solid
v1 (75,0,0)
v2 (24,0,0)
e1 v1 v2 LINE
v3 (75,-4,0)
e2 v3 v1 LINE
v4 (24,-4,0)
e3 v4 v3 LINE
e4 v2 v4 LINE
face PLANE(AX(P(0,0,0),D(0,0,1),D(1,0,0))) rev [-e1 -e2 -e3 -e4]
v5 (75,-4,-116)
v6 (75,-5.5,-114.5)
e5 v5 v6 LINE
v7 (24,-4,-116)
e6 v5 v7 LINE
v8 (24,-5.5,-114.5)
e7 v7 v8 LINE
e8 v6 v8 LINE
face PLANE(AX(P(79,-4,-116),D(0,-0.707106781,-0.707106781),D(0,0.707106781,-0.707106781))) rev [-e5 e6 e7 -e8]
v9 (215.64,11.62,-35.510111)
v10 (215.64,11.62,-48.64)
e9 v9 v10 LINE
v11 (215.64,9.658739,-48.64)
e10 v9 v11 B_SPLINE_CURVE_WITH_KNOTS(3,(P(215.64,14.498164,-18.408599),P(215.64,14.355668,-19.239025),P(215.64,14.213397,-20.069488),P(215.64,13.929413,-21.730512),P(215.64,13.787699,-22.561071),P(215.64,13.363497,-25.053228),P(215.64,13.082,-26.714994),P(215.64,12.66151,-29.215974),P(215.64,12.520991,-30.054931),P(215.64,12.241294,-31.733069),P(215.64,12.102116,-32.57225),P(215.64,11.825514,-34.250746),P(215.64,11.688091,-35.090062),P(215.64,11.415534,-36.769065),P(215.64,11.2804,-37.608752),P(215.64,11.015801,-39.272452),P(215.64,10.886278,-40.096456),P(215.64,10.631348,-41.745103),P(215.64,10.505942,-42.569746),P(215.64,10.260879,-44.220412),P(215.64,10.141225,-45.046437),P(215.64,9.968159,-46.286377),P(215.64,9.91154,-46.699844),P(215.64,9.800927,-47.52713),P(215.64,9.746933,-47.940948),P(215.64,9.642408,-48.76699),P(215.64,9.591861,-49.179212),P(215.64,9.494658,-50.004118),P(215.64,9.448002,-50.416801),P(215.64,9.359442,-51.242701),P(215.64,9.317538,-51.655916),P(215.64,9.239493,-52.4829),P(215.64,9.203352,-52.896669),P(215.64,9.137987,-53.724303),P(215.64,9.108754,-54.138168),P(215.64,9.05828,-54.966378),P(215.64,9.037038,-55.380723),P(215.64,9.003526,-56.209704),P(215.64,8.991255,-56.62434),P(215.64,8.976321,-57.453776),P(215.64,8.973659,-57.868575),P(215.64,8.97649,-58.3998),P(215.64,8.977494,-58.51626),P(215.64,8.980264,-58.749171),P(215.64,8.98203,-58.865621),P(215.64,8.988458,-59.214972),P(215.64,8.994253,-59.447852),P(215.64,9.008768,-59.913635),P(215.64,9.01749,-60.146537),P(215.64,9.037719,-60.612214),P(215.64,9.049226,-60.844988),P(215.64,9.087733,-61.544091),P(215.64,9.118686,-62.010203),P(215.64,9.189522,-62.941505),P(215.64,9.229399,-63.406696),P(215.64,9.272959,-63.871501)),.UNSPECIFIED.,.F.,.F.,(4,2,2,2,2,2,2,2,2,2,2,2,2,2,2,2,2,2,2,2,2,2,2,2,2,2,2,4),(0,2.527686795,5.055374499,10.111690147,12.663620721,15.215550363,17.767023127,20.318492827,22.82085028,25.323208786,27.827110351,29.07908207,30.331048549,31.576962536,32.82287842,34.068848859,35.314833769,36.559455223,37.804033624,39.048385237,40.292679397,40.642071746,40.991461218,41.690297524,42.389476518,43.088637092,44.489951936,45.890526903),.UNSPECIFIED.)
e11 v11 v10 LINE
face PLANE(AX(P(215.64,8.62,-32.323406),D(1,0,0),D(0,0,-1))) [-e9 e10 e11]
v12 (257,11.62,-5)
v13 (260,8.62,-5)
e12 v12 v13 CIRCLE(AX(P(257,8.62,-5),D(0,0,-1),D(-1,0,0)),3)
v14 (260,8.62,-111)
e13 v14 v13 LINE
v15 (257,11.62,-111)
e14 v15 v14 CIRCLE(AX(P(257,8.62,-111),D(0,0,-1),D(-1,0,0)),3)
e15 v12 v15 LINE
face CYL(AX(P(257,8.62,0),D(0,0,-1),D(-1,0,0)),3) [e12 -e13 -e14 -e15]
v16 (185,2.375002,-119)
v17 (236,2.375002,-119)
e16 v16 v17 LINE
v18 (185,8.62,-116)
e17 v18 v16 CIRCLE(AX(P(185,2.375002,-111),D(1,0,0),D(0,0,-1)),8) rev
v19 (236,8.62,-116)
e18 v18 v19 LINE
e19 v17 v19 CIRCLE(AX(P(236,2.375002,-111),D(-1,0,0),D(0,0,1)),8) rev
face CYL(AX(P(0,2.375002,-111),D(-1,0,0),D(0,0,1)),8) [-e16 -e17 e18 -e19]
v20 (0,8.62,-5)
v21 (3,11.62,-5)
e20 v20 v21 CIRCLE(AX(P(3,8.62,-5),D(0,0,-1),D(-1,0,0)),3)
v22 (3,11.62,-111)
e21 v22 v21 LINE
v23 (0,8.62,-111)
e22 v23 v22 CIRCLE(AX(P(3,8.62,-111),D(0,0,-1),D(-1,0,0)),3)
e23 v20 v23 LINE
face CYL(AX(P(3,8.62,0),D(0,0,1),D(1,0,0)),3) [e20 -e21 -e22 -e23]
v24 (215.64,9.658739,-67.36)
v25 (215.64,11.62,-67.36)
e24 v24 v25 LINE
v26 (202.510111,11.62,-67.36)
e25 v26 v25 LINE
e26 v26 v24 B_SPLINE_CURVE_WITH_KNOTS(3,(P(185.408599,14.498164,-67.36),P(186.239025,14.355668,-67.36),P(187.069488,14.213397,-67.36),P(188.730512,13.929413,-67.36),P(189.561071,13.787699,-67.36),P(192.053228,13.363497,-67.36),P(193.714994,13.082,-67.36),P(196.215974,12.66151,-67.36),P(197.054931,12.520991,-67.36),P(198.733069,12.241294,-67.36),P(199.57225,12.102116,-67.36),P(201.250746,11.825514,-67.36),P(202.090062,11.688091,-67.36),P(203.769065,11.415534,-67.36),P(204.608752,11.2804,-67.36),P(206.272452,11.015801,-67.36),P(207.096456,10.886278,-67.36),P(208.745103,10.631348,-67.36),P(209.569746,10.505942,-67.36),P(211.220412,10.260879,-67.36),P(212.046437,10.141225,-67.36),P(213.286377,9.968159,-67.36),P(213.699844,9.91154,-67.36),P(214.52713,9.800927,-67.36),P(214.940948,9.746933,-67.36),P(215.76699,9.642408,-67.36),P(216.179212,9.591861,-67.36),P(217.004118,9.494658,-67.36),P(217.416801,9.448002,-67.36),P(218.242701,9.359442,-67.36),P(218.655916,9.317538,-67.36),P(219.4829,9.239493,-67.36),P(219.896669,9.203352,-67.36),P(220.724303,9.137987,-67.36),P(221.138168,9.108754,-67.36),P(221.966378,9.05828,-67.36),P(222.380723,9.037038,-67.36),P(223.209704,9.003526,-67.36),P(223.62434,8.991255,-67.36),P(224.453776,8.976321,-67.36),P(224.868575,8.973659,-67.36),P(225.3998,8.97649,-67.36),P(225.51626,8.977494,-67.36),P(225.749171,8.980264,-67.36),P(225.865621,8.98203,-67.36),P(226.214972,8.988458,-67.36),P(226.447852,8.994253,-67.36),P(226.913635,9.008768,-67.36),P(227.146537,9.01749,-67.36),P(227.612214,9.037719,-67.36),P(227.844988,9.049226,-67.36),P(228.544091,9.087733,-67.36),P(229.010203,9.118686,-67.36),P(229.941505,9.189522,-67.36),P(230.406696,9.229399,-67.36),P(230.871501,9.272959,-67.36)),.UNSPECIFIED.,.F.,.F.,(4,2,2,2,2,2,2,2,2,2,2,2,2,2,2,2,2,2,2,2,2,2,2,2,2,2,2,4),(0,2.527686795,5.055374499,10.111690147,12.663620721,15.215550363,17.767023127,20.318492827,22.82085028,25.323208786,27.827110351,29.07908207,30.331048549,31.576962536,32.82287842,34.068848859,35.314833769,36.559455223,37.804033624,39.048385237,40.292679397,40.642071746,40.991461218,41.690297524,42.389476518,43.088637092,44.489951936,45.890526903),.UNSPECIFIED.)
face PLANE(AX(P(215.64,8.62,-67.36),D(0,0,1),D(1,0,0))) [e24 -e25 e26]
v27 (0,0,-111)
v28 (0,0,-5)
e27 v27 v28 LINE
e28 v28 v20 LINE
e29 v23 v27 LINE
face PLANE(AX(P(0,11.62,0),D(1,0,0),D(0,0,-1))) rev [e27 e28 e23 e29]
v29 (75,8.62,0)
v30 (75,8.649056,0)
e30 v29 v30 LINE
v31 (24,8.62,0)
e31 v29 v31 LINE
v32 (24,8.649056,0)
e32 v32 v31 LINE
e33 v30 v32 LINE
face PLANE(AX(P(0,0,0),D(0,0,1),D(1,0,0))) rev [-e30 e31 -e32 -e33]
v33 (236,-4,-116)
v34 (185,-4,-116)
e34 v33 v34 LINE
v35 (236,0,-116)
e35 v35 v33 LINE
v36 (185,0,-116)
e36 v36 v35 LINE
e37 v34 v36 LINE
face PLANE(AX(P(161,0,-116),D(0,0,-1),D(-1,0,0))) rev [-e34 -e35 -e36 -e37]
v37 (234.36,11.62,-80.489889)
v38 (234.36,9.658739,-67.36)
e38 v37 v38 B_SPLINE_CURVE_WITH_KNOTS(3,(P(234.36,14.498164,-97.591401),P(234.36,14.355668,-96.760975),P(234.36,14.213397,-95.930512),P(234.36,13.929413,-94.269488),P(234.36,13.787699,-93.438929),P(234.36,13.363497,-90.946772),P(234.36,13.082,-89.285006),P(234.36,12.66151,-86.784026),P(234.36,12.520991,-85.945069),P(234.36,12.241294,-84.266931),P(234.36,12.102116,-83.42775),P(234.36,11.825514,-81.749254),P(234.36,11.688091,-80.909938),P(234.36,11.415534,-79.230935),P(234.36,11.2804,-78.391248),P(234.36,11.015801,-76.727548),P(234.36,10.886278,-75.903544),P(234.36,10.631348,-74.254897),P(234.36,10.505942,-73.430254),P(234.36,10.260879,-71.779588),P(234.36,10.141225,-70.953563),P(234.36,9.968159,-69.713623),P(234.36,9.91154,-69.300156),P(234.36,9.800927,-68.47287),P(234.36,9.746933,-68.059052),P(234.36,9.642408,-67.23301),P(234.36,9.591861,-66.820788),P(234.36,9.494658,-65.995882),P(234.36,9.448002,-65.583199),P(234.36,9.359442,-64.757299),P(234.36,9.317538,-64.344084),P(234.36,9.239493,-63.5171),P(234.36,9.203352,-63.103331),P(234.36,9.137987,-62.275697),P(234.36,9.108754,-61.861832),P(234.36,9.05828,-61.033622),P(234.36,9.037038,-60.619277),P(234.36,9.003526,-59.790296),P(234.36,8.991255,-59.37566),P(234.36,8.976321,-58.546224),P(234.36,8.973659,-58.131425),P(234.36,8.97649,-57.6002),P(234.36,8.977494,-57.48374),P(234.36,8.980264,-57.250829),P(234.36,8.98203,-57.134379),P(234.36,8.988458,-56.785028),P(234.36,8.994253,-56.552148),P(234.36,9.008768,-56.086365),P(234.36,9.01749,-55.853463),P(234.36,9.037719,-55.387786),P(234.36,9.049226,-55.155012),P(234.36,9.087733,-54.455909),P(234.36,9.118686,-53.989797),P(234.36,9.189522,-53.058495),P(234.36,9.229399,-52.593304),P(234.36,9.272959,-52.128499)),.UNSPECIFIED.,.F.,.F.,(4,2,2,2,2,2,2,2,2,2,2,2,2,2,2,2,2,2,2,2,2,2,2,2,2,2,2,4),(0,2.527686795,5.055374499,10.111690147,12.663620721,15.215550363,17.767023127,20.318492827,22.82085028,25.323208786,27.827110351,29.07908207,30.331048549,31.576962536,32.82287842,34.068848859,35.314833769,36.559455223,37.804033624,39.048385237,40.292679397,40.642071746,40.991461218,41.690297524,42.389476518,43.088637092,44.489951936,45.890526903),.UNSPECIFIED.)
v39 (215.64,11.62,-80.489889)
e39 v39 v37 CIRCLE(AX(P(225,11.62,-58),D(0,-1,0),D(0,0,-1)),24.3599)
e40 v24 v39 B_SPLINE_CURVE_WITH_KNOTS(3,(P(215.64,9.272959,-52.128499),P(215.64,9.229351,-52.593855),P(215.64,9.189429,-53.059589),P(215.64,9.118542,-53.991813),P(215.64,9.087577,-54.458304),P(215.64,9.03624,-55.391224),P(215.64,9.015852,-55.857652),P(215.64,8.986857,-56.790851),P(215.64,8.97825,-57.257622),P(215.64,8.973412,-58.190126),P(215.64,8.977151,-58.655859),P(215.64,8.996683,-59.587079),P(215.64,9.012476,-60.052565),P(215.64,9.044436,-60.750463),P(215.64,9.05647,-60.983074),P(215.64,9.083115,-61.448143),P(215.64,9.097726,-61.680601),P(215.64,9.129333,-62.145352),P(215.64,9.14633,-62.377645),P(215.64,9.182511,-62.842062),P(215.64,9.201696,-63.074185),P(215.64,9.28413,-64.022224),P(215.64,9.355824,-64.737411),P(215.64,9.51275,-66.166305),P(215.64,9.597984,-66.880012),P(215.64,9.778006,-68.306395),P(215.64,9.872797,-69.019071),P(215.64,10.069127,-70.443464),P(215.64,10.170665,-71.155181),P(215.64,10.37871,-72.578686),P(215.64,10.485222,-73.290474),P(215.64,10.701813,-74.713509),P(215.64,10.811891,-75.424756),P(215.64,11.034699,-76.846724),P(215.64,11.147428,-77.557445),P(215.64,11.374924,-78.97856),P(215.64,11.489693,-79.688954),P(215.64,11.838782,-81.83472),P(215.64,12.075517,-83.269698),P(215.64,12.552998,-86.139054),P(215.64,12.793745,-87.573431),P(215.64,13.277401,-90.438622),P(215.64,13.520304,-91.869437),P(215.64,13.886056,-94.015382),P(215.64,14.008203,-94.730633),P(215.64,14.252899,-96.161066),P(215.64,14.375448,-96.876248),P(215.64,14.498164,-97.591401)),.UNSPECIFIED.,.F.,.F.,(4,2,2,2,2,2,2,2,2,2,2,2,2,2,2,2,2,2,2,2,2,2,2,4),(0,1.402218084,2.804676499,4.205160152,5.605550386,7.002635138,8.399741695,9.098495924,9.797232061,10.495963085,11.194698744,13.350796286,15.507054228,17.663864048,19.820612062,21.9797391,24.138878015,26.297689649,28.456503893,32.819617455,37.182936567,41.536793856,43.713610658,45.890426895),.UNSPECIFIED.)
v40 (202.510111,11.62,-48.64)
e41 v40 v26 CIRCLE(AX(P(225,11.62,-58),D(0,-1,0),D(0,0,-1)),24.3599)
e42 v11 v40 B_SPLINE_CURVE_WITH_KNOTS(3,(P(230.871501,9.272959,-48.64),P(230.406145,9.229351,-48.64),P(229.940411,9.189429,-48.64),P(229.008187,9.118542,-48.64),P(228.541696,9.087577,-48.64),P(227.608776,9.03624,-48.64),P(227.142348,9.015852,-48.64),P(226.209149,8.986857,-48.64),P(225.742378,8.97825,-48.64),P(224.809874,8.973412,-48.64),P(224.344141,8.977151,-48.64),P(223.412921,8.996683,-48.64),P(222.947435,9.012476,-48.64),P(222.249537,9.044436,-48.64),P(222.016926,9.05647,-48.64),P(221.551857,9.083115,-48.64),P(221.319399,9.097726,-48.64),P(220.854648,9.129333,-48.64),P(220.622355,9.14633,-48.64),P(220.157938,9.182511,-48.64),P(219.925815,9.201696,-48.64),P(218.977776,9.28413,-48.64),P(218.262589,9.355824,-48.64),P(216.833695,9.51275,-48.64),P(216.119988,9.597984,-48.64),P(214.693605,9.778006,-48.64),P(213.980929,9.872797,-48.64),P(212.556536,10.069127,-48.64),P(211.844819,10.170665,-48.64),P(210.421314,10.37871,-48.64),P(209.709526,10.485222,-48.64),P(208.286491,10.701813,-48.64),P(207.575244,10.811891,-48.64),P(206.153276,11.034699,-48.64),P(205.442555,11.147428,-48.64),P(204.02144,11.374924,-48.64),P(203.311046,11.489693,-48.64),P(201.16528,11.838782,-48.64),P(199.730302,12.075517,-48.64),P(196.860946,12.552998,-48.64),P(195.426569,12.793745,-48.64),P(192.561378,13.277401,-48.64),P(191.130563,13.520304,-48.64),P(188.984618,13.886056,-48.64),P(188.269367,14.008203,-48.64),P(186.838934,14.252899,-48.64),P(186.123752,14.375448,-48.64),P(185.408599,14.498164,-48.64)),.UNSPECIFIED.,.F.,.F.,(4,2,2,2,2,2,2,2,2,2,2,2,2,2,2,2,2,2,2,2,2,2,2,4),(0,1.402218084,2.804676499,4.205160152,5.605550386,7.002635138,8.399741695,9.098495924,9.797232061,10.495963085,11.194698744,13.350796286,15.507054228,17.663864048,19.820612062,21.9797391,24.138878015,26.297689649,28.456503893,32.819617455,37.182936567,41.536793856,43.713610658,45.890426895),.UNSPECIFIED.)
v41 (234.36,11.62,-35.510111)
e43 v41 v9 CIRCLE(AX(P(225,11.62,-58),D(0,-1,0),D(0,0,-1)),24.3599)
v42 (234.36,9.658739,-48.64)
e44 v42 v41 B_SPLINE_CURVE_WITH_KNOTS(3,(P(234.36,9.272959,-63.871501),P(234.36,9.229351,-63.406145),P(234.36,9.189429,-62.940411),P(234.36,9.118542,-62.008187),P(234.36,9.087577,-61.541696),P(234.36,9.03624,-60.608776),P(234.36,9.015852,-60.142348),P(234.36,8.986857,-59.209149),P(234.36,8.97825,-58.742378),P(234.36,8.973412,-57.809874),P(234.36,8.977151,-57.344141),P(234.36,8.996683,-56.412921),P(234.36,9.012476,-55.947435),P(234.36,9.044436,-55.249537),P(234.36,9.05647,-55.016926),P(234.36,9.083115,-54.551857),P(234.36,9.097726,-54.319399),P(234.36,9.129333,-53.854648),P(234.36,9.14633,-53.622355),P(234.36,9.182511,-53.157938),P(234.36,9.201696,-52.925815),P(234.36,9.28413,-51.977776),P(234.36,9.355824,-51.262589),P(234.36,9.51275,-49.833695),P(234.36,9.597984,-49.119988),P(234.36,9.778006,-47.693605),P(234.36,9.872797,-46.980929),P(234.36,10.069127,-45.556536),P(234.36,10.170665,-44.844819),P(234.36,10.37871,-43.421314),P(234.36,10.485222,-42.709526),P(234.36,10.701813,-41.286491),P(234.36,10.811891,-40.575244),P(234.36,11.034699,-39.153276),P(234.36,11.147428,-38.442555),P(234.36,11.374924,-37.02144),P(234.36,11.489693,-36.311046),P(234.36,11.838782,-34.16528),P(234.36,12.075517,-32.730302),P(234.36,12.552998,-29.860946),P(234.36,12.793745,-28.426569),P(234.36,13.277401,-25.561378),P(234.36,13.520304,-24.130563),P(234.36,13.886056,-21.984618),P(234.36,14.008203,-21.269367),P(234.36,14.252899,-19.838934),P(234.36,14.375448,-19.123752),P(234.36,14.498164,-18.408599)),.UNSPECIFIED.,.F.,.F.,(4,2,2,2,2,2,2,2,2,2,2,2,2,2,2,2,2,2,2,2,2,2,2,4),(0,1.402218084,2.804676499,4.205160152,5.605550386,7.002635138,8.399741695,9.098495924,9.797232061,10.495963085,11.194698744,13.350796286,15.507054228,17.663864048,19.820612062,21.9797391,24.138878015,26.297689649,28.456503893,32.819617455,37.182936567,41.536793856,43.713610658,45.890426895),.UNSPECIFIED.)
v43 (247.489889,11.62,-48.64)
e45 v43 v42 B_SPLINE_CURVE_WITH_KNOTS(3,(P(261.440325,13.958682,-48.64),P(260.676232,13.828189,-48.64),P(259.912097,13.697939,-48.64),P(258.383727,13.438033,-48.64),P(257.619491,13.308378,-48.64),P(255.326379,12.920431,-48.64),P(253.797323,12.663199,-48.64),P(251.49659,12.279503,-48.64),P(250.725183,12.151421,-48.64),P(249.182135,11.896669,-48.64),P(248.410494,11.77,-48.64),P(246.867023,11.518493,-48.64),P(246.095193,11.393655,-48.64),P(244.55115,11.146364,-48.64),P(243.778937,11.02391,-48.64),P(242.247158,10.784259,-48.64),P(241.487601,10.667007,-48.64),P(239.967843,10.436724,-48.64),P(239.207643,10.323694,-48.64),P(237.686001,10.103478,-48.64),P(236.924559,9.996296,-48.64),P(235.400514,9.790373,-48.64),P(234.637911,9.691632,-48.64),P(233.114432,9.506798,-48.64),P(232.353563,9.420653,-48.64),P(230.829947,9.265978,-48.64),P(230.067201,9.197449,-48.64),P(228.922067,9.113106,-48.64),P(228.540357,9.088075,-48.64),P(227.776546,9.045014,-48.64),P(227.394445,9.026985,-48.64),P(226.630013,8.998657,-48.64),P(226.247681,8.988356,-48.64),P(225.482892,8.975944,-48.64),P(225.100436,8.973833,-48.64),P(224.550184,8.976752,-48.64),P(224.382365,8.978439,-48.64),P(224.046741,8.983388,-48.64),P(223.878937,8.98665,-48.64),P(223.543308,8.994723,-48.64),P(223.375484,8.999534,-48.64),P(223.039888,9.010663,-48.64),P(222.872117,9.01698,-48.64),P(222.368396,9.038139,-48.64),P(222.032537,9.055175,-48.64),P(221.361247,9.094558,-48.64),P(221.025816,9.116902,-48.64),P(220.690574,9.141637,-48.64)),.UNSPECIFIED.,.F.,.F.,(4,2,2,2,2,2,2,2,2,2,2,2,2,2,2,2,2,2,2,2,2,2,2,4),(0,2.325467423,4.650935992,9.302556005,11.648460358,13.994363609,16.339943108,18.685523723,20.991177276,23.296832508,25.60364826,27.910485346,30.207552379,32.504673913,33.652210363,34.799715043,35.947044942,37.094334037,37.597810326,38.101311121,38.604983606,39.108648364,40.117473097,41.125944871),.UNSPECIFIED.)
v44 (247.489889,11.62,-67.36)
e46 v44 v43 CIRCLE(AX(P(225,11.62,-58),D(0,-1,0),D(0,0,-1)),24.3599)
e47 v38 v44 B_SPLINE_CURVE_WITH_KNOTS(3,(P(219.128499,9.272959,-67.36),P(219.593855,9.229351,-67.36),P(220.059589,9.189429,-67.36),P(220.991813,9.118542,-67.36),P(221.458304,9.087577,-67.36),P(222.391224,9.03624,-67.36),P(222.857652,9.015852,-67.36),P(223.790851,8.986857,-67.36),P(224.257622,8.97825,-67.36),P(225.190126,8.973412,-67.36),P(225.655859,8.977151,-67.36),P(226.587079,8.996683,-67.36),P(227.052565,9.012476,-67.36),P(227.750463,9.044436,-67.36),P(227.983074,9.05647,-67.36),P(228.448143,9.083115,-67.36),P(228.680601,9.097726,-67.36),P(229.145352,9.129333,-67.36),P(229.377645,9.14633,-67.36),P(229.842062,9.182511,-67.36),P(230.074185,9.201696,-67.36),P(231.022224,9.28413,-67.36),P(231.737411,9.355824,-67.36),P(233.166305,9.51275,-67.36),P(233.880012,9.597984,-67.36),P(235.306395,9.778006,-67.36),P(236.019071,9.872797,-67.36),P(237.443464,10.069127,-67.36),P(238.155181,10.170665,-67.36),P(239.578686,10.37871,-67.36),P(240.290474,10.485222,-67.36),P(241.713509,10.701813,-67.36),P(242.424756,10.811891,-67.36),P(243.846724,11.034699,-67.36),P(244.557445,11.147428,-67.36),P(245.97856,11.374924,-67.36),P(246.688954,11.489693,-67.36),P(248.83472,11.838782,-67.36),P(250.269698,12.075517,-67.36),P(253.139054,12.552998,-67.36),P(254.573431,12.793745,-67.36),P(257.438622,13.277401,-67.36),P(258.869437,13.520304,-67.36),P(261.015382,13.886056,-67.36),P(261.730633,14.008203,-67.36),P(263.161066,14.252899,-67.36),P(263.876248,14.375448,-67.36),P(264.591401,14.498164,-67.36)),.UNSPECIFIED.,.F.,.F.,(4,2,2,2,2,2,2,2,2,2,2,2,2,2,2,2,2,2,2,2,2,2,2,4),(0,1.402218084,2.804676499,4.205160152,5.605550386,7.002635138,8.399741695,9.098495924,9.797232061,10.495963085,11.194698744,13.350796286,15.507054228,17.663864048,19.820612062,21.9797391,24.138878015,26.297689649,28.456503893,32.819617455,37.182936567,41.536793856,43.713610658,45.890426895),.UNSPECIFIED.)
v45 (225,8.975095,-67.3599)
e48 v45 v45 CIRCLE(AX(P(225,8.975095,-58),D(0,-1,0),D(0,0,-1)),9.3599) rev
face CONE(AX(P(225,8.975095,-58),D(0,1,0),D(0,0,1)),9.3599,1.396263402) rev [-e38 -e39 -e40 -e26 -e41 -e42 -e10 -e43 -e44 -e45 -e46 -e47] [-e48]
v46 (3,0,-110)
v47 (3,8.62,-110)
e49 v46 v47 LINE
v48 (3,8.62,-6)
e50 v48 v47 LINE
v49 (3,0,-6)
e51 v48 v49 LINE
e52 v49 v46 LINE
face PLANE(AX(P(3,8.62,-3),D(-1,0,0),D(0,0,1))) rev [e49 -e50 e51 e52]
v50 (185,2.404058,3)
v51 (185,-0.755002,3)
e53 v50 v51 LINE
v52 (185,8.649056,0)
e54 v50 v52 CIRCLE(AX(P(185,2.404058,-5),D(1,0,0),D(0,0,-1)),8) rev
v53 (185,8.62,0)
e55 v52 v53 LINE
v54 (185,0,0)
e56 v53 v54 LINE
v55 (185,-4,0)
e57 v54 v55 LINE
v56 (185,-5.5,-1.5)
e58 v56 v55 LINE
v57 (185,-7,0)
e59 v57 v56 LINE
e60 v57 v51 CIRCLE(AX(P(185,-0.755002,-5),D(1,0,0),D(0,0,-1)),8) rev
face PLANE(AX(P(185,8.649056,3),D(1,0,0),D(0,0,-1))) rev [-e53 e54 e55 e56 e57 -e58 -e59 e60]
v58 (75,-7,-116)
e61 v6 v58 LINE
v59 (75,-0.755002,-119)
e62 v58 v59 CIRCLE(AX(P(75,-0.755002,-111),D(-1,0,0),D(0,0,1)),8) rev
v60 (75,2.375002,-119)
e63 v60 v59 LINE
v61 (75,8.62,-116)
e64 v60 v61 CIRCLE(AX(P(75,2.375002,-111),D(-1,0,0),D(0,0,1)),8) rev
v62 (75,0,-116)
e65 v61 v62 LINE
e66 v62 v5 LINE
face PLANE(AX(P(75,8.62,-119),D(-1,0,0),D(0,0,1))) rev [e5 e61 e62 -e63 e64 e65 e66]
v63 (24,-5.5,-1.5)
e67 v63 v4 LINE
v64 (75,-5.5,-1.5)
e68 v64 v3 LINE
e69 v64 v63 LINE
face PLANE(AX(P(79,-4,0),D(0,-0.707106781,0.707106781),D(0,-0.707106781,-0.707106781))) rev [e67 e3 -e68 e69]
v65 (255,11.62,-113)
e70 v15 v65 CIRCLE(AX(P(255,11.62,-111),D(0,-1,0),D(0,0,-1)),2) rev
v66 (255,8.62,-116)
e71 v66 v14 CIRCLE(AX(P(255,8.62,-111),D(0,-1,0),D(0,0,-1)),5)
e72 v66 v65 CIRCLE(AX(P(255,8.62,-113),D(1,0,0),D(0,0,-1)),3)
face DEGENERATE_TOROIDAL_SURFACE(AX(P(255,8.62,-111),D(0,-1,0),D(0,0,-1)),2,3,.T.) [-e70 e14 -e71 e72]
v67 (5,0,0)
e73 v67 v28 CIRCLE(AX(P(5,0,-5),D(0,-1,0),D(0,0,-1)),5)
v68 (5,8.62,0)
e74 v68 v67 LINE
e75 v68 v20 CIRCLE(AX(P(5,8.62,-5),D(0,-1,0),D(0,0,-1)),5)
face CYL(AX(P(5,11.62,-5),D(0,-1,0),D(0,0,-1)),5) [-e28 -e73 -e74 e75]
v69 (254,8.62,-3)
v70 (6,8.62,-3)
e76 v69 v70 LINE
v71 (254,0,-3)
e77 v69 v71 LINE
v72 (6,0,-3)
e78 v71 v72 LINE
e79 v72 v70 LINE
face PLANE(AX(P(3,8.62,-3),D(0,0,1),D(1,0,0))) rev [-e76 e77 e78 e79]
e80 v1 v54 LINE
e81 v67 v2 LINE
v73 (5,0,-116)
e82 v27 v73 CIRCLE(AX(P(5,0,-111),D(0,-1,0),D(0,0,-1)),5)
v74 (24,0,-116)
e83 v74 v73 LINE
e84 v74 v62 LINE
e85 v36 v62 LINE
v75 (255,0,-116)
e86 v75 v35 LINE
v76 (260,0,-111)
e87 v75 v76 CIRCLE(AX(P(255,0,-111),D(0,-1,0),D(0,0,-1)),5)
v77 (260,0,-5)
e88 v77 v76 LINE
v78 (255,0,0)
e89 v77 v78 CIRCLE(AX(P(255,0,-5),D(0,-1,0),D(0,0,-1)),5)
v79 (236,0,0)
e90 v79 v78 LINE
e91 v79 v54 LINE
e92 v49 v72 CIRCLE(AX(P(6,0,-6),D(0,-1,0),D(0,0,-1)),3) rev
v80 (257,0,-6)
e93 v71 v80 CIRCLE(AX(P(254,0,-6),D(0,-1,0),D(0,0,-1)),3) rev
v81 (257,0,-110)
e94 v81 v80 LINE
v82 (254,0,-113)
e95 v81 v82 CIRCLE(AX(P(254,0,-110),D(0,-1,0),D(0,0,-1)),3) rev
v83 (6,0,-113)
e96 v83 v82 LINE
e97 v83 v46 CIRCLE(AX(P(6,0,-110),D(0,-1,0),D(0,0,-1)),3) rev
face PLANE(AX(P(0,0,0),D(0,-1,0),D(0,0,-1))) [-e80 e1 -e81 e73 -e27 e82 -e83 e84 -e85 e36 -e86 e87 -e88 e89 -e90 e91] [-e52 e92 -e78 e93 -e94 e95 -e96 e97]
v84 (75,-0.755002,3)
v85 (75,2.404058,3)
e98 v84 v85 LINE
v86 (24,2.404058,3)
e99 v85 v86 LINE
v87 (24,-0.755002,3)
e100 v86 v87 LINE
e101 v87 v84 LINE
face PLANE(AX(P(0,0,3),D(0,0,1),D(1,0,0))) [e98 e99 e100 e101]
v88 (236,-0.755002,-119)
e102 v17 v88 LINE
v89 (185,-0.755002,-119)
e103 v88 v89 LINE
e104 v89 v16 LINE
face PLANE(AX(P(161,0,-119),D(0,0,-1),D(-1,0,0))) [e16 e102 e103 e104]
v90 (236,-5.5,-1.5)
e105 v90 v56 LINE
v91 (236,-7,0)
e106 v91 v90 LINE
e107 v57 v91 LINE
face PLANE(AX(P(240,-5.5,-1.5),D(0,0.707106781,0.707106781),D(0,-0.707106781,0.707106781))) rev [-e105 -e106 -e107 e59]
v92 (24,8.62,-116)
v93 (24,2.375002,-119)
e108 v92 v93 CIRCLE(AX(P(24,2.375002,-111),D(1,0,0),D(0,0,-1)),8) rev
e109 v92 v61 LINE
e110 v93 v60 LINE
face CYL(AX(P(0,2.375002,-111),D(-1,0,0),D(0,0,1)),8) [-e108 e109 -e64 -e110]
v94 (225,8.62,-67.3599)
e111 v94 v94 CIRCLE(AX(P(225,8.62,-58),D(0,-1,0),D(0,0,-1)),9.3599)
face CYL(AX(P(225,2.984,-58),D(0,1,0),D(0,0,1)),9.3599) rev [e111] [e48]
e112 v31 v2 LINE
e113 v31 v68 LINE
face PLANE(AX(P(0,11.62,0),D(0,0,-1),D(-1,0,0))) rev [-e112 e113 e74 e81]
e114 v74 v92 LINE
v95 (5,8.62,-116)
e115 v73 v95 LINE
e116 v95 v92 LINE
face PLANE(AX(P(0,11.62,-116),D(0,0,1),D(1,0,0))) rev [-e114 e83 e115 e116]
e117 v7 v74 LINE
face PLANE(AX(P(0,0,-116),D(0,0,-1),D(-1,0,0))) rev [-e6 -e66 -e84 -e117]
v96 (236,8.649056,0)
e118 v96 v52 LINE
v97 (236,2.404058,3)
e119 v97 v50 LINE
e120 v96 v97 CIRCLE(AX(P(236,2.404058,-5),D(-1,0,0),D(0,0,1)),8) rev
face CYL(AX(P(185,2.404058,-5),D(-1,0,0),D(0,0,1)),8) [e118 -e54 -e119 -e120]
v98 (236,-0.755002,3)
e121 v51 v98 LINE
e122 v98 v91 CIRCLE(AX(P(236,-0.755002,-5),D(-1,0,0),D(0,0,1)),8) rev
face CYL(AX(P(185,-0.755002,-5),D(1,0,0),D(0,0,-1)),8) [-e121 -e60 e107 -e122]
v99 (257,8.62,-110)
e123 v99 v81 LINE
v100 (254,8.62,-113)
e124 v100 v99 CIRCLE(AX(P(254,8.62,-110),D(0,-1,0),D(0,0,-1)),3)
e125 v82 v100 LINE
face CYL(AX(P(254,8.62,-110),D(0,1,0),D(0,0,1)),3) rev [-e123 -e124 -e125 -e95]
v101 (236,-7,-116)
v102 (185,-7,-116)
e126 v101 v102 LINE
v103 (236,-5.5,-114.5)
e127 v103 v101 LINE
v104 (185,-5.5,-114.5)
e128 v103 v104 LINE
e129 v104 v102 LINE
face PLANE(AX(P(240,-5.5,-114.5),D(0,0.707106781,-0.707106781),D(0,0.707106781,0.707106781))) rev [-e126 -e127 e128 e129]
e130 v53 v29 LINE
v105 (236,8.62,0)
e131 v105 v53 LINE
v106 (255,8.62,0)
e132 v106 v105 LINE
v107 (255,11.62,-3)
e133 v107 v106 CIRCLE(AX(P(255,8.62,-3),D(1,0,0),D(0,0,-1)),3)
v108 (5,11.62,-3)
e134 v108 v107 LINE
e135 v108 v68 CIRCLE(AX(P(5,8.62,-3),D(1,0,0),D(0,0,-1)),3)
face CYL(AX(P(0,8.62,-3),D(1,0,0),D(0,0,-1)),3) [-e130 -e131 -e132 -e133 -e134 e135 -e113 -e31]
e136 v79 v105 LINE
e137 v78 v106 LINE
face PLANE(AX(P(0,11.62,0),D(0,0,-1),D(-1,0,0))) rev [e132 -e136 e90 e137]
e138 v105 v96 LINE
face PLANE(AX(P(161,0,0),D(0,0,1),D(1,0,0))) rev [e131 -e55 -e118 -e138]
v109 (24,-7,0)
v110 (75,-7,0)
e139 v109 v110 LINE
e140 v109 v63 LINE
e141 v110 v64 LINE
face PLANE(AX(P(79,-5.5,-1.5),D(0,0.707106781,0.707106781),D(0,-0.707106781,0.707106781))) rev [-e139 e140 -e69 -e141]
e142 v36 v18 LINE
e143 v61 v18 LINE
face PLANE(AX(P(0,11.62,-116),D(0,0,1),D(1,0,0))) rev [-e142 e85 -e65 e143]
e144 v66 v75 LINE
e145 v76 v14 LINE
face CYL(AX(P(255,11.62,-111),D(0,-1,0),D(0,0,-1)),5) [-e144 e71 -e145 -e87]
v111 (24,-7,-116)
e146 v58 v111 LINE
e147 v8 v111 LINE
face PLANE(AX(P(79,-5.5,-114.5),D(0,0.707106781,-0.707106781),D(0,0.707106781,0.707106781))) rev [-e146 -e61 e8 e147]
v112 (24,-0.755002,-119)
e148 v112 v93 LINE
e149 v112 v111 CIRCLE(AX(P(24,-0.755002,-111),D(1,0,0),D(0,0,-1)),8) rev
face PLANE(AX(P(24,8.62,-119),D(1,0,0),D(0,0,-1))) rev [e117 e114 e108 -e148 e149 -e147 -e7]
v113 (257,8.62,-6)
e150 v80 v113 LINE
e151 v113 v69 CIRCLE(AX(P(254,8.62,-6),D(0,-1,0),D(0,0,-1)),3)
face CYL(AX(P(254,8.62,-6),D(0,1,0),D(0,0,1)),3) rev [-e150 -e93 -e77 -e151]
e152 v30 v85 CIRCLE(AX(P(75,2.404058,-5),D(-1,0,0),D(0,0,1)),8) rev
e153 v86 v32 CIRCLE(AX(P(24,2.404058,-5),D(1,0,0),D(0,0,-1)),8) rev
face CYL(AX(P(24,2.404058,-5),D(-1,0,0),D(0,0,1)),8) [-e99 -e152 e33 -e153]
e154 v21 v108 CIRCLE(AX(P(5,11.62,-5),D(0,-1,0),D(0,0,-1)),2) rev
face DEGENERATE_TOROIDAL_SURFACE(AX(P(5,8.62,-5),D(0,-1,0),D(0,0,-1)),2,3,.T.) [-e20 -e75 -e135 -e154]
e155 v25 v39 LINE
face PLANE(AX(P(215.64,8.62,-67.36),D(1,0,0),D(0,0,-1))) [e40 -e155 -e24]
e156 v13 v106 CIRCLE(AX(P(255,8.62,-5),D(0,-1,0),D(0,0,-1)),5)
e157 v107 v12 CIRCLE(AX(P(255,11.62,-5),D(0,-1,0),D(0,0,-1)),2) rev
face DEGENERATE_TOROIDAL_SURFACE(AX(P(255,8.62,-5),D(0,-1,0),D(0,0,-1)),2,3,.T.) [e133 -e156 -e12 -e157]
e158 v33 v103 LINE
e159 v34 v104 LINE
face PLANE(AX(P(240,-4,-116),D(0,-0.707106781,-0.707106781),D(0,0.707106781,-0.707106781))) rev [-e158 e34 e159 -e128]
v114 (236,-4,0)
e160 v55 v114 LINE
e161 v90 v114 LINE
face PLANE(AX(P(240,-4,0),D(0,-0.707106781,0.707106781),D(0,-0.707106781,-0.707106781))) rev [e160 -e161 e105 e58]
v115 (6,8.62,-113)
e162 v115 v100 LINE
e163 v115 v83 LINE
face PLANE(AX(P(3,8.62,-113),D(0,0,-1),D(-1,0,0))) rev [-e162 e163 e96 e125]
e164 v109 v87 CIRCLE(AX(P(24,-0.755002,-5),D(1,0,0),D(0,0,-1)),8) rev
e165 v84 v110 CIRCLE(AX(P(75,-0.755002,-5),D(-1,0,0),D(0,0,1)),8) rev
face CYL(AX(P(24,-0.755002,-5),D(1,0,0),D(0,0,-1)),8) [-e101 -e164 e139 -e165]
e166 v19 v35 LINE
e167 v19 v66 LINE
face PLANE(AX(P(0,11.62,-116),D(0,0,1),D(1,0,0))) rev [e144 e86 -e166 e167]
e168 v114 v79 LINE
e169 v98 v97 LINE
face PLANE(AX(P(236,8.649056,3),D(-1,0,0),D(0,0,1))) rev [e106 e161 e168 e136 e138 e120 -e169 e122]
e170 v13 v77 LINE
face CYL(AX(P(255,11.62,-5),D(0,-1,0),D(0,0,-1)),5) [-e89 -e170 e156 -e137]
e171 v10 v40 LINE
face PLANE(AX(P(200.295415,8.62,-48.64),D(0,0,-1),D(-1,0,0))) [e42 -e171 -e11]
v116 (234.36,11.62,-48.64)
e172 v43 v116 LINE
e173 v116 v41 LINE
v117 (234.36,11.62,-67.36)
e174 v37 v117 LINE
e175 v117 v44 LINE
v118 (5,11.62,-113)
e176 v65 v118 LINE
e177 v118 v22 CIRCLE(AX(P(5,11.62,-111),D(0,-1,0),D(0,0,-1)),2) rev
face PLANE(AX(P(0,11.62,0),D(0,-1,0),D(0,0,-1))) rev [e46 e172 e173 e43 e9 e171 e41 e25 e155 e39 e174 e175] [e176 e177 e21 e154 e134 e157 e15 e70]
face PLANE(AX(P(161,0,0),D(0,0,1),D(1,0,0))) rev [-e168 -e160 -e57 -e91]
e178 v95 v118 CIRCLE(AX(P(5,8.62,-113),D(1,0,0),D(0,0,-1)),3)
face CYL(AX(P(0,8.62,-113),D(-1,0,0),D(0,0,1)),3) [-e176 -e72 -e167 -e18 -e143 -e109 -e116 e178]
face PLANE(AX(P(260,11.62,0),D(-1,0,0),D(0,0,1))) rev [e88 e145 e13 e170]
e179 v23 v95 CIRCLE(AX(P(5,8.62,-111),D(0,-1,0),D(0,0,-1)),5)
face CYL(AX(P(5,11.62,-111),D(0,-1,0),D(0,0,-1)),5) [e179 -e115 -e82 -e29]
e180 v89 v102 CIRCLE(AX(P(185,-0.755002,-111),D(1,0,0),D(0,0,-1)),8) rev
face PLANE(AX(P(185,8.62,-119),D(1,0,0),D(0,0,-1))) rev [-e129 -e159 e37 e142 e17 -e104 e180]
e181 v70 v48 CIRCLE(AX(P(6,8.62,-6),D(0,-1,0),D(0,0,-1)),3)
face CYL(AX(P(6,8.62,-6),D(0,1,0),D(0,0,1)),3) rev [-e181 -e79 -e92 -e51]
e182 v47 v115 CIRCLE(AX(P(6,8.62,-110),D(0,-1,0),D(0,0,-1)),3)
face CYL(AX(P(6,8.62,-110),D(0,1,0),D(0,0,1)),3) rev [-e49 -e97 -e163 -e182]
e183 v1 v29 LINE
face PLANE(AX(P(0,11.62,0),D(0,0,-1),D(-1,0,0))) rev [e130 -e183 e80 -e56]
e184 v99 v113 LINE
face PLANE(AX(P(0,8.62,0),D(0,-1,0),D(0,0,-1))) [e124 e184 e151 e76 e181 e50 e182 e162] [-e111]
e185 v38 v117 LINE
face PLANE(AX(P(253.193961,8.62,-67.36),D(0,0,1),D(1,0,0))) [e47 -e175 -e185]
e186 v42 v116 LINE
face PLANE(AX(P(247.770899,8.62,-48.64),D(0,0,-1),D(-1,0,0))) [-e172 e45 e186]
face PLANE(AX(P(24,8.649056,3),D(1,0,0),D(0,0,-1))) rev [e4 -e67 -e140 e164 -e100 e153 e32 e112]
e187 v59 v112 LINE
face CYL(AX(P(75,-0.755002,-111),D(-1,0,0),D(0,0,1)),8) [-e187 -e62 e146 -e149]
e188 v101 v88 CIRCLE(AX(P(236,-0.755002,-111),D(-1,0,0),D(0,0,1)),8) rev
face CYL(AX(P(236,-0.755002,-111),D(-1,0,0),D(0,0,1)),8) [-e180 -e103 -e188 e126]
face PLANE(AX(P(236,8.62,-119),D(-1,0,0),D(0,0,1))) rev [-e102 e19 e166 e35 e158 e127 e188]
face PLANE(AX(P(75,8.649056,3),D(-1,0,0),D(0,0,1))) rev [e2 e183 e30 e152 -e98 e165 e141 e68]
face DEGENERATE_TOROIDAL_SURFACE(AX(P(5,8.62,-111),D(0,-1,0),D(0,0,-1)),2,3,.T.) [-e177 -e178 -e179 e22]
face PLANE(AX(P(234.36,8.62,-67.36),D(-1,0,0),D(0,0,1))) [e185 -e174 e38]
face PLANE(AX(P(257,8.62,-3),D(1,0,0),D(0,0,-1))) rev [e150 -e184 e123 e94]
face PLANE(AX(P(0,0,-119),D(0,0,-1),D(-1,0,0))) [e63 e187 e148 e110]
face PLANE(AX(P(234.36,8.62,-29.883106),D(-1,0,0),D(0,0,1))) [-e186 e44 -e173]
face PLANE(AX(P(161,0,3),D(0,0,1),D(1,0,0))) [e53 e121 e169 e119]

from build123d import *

# Parameters (mm, degrees)
SKETCH1_W              = 260
SKETCH1_H              = 116
BOSS_EXTRUDE1_DEPTH    = 11.62
FILLET1_R              = 5
FILLET2_R              = 3
SKETCH2_W              = 254
SKETCH2_H              = 110
CUT_EXTRUDE1_DEPTH     = 8.62
FILLET3_R              = 3
SKETCH6_R              = 9.3599
CUT_EXTRUDE4_DEPTH     = 8.636
SKETCH7_W              = 51
SKETCH7_H              = 15.649055797
BOSS_EXTRUDE3_DEPTH    = 3
FILLET6_R              = 8
FILLET7_R              = 8
SKETCH8_W              = 51
SKETCH8_H              = 3
BOSS_EXTRUDE4_DEPTH    = 1.5
CUT_EXTRUDE5_DEPTH     = 55
LPATTERN2_COUNT        = 2
LPATTERN2_PITCH        = 161
FILLET6_OF_LPATTERN2_R = 8
FILLET7_OF_LPATTERN2_R = 8
SKETCH10_W             = 51
SKETCH10_H             = 15.62
BOSS_EXTRUDE5_DEPTH    = 3
FILLET8_R              = 8
SKETCH11_W             = 51
SKETCH11_H             = 3
BOSS_EXTRUDE6_DEPTH    = 1.5
CUT_EXTRUDE6_DEPTH     = 55
LPATTERN3_COUNT        = 2
LPATTERN3_PITCH        = 161
FILLET8_OF_LPATTERN3_R = 8
CHAMFER1_SIZE          = 15
CHAMFER1_SIZE2         = 2.644904711
SKETCH13_W             = 18.833961405
SKETCH13_H             = 27.155748893
SKETCH13_W_2           = 23.540134481
SKETCH13_H_2           = 26.001362064
SKETCH13_W_3           = 13.410899097
SKETCH13_H_3           = 18.756893662
SKETCH13_W_4           = 15.344585033
SKETCH13_H_4           = 16.316593901
BOSS_EXTRUDE7_DEPTH    = 3


with BuildPart() as part:
    # Sketch1 → Boss-Extrude1 (new body)
    with BuildSketch(Plane(origin=(0, 0, 0), x_dir=(1, 0, 0), z_dir=(0, 1, 0))):
        with Locations((130, 58)):
            Rectangle(SKETCH1_W, SKETCH1_H)
    extrude(amount=BOSS_EXTRUDE1_DEPTH)

    # Fillet1
    fillet1_edges = [part.edges().sort_by_distance(p)[0] for p in [
        (0, 5.81, -116),
        (260, 5.81, -116),
        (260, 5.81, 0),
        (0, 5.81, 0),
    ]]
    fillet(fillet1_edges, radius=FILLET1_R)

    # Fillet2
    fillet2_edges = [part.edges().sort_by_distance(p)[0] for p in [
        (130, 11.62, 0),
        (0, 11.62, -58),
        (260, 11.62, -58),
        (130, 11.62, -116),
        (1.464466094, 11.62, -114.535533906),
        (258.535533906, 11.62, -114.535533906),
        (258.535533906, 11.62, -1.464466094),
        (1.464466094, 11.62, -1.464466094),
    ]]
    fillet(fillet2_edges, radius=FILLET2_R)

    # Sketch2 → Cut-Extrude1 (cut)
    with BuildSketch(Plane.XZ):
        with Locations((130, -58)):
            Rectangle(SKETCH2_W, SKETCH2_H)
    extrude(amount=-CUT_EXTRUDE1_DEPTH, mode=Mode.SUBTRACT)

    # Fillet3
    fillet3_edges = [part.edges().sort_by_distance(p)[0] for p in [
        (3, 4.31, -113),
        (3, 4.31, -3),
        (257, 4.31, -3),
        (257, 4.31, -113),
    ]]
    fillet(fillet3_edges, radius=FILLET3_R)

    # Sketch6 → Cut-Extrude4 (cut)
    with BuildSketch(Plane(origin=(0, 11.62, 0), x_dir=(1, 0, 0), z_dir=(0, 1, 0))):
        with Locations(Location((225, 58, 0), (0, 0, 270))):
            Circle(SKETCH6_R)
    extrude(amount=-CUT_EXTRUDE4_DEPTH, mode=Mode.SUBTRACT)

    # Sketch7 → Boss-Extrude3 (add)
    with BuildSketch(Plane.XY):
        with Locations((49.5, 0.824527899)):
            Rectangle(SKETCH7_W, SKETCH7_H)
    boss_extrude3 = extrude(amount=BOSS_EXTRUDE3_DEPTH)

    # Fillet6
    # the kernel refuses this fillet: 8 mm, written as the material it takes off along each edge
    with BuildSketch(Plane(origin=(8.387505004, 8.649055797, 3), x_dir=(0, 0, -1), z_dir=(1, 0, 0))) as fillet6_piece_1:
        with BuildLine():
            CenterArc((8, -6.244997998), FILLET6_R, 128.682187453, 51.317812547)
            Line((0, -6.244997998), (-0.16, -6.244997998))
            Line((-0.16, -6.244997998), (-0.16, 0))
            Line((-0.16, 0), (0, 0.16))
            ThreePointArc((0, 0.16), (1.5, 0.16), (2.9, 0.12489996))
            Line((2.9, 0.12489996), (3, 0))
        make_face()
    extrude(amount=82.224989992, mode=Mode.SUBTRACT)

    # Fillet7
    # the kernel refuses this fillet: 8 mm, written as the material it takes off along each edge
    with BuildSketch(Plane(origin=(90.612494996, -7, 3), x_dir=(0, 0, -1), z_dir=(-1, 0, 0))) as fillet7_piece_1:
        with BuildLine():
            CenterArc((8, -6.244997998), FILLET7_R, 128.682187453, 51.317812547)
            Line((0, -6.244997998), (-0.16, -6.244997998))
            Line((-0.16, -6.244997998), (-0.16, 0))
            Line((-0.16, 0), (0, 0.16))
            ThreePointArc((0, 0.16), (1.5, 0.16), (2.9, 0.12489996))
            Line((2.9, 0.12489996), (3, 0))
        make_face()
    extrude(amount=82.224989992, mode=Mode.SUBTRACT)

    # Sketch8 → Boss-Extrude4 (add)
    with BuildSketch(Plane(origin=(0, 0, 0), x_dir=(-1, 0, 0), z_dir=(0, 0, -1))):
        with Locations((-49.5, -5.5)):
            Rectangle(SKETCH8_W, SKETCH8_H)
    boss_extrude4 = extrude(amount=BOSS_EXTRUDE4_DEPTH)

    # Sketch9 → Cut-Extrude5 (cut)
    with BuildSketch(Plane.ZY.offset(-24)):
        Polygon((0, -4), (-1.5, -5.5), (0, -7), (-1.5, -7), (-2.053402402, -7), (-2.053402402, -4), (-1.5, -4), align=None)
    cut_extrude5 = extrude(amount=-CUT_EXTRUDE5_DEPTH, mode=Mode.SUBTRACT)

    # LPattern2: Boss-Extrude3, Boss-Extrude4, Cut-Extrude5 ×2
    with Locations(*[(i * LPATTERN2_PITCH, 0, 0) for i in range(1, LPATTERN2_COUNT)]):
        add(boss_extrude3)
        add(boss_extrude4)
        add(cut_extrude5, mode=Mode.SUBTRACT)

    # Fillet6 of LPattern2
    # the kernel refuses this fillet: 8 mm, written as the material it takes off along each edge
    with BuildSketch(Plane(origin=(169.387505004, 8.649055797, 3), x_dir=(0, 0, -1), z_dir=(1, 0, 0))) as fillet6_of_lpattern2_piece_1:
        with BuildLine():
            CenterArc((8, -6.244997998), FILLET6_OF_LPATTERN2_R, 128.682187453, 51.317812547)
            Line((0, -6.244997998), (-0.16, -6.244997998))
            Line((-0.16, -6.244997998), (-0.16, 0))
            Line((-0.16, 0), (0, 0.16))
            ThreePointArc((0, 0.16), (1.5, 0.16), (2.9, 0.12489996))
            Line((2.9, 0.12489996), (3, 0))
        make_face()
    extrude(amount=82.224989992, mode=Mode.SUBTRACT)

    # Fillet7 of LPattern2
    # the kernel refuses this fillet: 8 mm, written as the material it takes off along each edge
    with BuildSketch(Plane(origin=(251.612494996, -7, 3), x_dir=(0, 1, 0), z_dir=(-1, 0, 0))) as fillet7_of_lpattern2_piece_1:
        with BuildLine():
            CenterArc((6.244997998, 8), FILLET7_OF_LPATTERN2_R, 218.682187453, 51.317812547)
            Line((0, 3), (-0.12489996, 2.9))
            ThreePointArc((-0.12489996, 2.9), (-0.16, 1.5), (-0.16, 0))
            Line((-0.16, 0), (0, -0.16))
            Line((0, -0.16), (6.244997998, -0.16))
            Line((6.244997998, -0.16), (6.244997998, 0))
        make_face()
    extrude(amount=82.224989992, mode=Mode.SUBTRACT)

    # Sketch10 → Boss-Extrude5 (add)
    with BuildSketch(Plane(origin=(0, 0, -116), x_dir=(-1, 0, 0), z_dir=(0, 0, -1))):
        with Locations((-49.5, 0.81)):
            Rectangle(SKETCH10_W, SKETCH10_H)
    boss_extrude5 = extrude(amount=BOSS_EXTRUDE5_DEPTH)

    # Fillet8
    # the kernel refuses this fillet: 8 mm, written as the material it takes off along each edge
    with BuildSketch(Plane(origin=(8.387505004, -7, -119), x_dir=(0, 0, 1), z_dir=(1, 0, 0)), Plane(origin=(90.612494996, 8.62, -119), x_dir=(0, 0, 1), z_dir=(-1, 0, 0))) as fillet8_piece_1:
        with BuildLine():
            CenterArc((8, -6.244997998), FILLET8_R, 128.682187453, 51.317812547)
            Line((0, -6.244997998), (-0.16, -6.244997998))
            Line((-0.16, -6.244997998), (-0.16, 0))
            Line((-0.16, 0), (0, 0.16))
            ThreePointArc((0, 0.16), (1.5, 0.16), (2.9, 0.12489996))
            Line((2.9, 0.12489996), (3, 0))
        make_face()
    extrude(amount=82.224989992, mode=Mode.SUBTRACT)

    # Sketch11 → Boss-Extrude6 (add)
    with BuildSketch(Plane.XY.offset(-116)):
        with Locations((49.5, -5.5)):
            Rectangle(SKETCH11_W, SKETCH11_H)
    boss_extrude6 = extrude(amount=BOSS_EXTRUDE6_DEPTH)

    # Sketch12 → Cut-Extrude6 (cut)
    with BuildSketch(Plane.ZY.offset(-24)):
        Polygon((-116, -4), (-114.5, -5.5), (-116, -7), (-111.986018157, -7), (-111.986018157, -3.7983216), align=None)
    cut_extrude6 = extrude(amount=-CUT_EXTRUDE6_DEPTH, mode=Mode.SUBTRACT)

    # LPattern3: Boss-Extrude5, Boss-Extrude6, Cut-Extrude6 ×2
    with Locations(*[(i * LPATTERN3_PITCH, 0, 0) for i in range(1, LPATTERN3_COUNT)]):
        add(boss_extrude5)
        add(boss_extrude6)
        add(cut_extrude6, mode=Mode.SUBTRACT)

    # Fillet8 of LPattern3
    # the kernel refuses this fillet: 8 mm, written as the material it takes off along each edge
    with BuildSketch(Plane(origin=(169.387505004, -7, -119), x_dir=(0, 0, 1), z_dir=(1, 0, 0)), Plane(origin=(251.612494996, 8.62, -119), x_dir=(0, 0, 1), z_dir=(-1, 0, 0))) as fillet8_of_lpattern3_piece_1:
        with BuildLine():
            CenterArc((8, -6.244997998), FILLET8_OF_LPATTERN3_R, 128.682187453, 51.317812547)
            Line((0, -6.244997998), (-0.16, -6.244997998))
            Line((-0.16, -6.244997998), (-0.16, 0))
            Line((-0.16, 0), (0, 0.16))
            ThreePointArc((0, 0.16), (1.5, 0.16), (2.9, 0.12489996))
            Line((2.9, 0.12489996), (3, 0))
        make_face()
    extrude(amount=82.224989992, mode=Mode.SUBTRACT)

    # Chamfer1
    chamfer1_edges = [part.edges().sort_by_distance(p)[0] for p in [
        (225, 11.62, -67.3599),
    ]]
    chamfer1_side = [part.faces().sort_by_distance(p)[0] for p in [
        (129.054758669, 11.62, -58),
    ]]
    chamfer(chamfer1_edges, length=CHAMFER1_SIZE, length2=CHAMFER1_SIZE2, reference=chamfer1_side[0])

    # Sketch13 → Boss-Extrude7 (add)
    with BuildSketch(Plane(origin=(0, 11.62, 0), x_dir=(1, 0, 0), z_dir=(0, 1, 0))):
        with Locations((243.776980702, 80.937874447)):
            Rectangle(SKETCH13_W, SKETCH13_H)
        with Locations((203.86993276, 80.360681032)):
            Rectangle(SKETCH13_W_2, SKETCH13_H_2)
        with Locations((241.065449548, 39.261553169)):
            Rectangle(SKETCH13_W_3, SKETCH13_H_3)
        with Locations((207.967707484, 40.481703049)):
            Rectangle(SKETCH13_W_4, SKETCH13_H_4)
    extrude(amount=-BOSS_EXTRUDE7_DEPTH)


solid = part.part
